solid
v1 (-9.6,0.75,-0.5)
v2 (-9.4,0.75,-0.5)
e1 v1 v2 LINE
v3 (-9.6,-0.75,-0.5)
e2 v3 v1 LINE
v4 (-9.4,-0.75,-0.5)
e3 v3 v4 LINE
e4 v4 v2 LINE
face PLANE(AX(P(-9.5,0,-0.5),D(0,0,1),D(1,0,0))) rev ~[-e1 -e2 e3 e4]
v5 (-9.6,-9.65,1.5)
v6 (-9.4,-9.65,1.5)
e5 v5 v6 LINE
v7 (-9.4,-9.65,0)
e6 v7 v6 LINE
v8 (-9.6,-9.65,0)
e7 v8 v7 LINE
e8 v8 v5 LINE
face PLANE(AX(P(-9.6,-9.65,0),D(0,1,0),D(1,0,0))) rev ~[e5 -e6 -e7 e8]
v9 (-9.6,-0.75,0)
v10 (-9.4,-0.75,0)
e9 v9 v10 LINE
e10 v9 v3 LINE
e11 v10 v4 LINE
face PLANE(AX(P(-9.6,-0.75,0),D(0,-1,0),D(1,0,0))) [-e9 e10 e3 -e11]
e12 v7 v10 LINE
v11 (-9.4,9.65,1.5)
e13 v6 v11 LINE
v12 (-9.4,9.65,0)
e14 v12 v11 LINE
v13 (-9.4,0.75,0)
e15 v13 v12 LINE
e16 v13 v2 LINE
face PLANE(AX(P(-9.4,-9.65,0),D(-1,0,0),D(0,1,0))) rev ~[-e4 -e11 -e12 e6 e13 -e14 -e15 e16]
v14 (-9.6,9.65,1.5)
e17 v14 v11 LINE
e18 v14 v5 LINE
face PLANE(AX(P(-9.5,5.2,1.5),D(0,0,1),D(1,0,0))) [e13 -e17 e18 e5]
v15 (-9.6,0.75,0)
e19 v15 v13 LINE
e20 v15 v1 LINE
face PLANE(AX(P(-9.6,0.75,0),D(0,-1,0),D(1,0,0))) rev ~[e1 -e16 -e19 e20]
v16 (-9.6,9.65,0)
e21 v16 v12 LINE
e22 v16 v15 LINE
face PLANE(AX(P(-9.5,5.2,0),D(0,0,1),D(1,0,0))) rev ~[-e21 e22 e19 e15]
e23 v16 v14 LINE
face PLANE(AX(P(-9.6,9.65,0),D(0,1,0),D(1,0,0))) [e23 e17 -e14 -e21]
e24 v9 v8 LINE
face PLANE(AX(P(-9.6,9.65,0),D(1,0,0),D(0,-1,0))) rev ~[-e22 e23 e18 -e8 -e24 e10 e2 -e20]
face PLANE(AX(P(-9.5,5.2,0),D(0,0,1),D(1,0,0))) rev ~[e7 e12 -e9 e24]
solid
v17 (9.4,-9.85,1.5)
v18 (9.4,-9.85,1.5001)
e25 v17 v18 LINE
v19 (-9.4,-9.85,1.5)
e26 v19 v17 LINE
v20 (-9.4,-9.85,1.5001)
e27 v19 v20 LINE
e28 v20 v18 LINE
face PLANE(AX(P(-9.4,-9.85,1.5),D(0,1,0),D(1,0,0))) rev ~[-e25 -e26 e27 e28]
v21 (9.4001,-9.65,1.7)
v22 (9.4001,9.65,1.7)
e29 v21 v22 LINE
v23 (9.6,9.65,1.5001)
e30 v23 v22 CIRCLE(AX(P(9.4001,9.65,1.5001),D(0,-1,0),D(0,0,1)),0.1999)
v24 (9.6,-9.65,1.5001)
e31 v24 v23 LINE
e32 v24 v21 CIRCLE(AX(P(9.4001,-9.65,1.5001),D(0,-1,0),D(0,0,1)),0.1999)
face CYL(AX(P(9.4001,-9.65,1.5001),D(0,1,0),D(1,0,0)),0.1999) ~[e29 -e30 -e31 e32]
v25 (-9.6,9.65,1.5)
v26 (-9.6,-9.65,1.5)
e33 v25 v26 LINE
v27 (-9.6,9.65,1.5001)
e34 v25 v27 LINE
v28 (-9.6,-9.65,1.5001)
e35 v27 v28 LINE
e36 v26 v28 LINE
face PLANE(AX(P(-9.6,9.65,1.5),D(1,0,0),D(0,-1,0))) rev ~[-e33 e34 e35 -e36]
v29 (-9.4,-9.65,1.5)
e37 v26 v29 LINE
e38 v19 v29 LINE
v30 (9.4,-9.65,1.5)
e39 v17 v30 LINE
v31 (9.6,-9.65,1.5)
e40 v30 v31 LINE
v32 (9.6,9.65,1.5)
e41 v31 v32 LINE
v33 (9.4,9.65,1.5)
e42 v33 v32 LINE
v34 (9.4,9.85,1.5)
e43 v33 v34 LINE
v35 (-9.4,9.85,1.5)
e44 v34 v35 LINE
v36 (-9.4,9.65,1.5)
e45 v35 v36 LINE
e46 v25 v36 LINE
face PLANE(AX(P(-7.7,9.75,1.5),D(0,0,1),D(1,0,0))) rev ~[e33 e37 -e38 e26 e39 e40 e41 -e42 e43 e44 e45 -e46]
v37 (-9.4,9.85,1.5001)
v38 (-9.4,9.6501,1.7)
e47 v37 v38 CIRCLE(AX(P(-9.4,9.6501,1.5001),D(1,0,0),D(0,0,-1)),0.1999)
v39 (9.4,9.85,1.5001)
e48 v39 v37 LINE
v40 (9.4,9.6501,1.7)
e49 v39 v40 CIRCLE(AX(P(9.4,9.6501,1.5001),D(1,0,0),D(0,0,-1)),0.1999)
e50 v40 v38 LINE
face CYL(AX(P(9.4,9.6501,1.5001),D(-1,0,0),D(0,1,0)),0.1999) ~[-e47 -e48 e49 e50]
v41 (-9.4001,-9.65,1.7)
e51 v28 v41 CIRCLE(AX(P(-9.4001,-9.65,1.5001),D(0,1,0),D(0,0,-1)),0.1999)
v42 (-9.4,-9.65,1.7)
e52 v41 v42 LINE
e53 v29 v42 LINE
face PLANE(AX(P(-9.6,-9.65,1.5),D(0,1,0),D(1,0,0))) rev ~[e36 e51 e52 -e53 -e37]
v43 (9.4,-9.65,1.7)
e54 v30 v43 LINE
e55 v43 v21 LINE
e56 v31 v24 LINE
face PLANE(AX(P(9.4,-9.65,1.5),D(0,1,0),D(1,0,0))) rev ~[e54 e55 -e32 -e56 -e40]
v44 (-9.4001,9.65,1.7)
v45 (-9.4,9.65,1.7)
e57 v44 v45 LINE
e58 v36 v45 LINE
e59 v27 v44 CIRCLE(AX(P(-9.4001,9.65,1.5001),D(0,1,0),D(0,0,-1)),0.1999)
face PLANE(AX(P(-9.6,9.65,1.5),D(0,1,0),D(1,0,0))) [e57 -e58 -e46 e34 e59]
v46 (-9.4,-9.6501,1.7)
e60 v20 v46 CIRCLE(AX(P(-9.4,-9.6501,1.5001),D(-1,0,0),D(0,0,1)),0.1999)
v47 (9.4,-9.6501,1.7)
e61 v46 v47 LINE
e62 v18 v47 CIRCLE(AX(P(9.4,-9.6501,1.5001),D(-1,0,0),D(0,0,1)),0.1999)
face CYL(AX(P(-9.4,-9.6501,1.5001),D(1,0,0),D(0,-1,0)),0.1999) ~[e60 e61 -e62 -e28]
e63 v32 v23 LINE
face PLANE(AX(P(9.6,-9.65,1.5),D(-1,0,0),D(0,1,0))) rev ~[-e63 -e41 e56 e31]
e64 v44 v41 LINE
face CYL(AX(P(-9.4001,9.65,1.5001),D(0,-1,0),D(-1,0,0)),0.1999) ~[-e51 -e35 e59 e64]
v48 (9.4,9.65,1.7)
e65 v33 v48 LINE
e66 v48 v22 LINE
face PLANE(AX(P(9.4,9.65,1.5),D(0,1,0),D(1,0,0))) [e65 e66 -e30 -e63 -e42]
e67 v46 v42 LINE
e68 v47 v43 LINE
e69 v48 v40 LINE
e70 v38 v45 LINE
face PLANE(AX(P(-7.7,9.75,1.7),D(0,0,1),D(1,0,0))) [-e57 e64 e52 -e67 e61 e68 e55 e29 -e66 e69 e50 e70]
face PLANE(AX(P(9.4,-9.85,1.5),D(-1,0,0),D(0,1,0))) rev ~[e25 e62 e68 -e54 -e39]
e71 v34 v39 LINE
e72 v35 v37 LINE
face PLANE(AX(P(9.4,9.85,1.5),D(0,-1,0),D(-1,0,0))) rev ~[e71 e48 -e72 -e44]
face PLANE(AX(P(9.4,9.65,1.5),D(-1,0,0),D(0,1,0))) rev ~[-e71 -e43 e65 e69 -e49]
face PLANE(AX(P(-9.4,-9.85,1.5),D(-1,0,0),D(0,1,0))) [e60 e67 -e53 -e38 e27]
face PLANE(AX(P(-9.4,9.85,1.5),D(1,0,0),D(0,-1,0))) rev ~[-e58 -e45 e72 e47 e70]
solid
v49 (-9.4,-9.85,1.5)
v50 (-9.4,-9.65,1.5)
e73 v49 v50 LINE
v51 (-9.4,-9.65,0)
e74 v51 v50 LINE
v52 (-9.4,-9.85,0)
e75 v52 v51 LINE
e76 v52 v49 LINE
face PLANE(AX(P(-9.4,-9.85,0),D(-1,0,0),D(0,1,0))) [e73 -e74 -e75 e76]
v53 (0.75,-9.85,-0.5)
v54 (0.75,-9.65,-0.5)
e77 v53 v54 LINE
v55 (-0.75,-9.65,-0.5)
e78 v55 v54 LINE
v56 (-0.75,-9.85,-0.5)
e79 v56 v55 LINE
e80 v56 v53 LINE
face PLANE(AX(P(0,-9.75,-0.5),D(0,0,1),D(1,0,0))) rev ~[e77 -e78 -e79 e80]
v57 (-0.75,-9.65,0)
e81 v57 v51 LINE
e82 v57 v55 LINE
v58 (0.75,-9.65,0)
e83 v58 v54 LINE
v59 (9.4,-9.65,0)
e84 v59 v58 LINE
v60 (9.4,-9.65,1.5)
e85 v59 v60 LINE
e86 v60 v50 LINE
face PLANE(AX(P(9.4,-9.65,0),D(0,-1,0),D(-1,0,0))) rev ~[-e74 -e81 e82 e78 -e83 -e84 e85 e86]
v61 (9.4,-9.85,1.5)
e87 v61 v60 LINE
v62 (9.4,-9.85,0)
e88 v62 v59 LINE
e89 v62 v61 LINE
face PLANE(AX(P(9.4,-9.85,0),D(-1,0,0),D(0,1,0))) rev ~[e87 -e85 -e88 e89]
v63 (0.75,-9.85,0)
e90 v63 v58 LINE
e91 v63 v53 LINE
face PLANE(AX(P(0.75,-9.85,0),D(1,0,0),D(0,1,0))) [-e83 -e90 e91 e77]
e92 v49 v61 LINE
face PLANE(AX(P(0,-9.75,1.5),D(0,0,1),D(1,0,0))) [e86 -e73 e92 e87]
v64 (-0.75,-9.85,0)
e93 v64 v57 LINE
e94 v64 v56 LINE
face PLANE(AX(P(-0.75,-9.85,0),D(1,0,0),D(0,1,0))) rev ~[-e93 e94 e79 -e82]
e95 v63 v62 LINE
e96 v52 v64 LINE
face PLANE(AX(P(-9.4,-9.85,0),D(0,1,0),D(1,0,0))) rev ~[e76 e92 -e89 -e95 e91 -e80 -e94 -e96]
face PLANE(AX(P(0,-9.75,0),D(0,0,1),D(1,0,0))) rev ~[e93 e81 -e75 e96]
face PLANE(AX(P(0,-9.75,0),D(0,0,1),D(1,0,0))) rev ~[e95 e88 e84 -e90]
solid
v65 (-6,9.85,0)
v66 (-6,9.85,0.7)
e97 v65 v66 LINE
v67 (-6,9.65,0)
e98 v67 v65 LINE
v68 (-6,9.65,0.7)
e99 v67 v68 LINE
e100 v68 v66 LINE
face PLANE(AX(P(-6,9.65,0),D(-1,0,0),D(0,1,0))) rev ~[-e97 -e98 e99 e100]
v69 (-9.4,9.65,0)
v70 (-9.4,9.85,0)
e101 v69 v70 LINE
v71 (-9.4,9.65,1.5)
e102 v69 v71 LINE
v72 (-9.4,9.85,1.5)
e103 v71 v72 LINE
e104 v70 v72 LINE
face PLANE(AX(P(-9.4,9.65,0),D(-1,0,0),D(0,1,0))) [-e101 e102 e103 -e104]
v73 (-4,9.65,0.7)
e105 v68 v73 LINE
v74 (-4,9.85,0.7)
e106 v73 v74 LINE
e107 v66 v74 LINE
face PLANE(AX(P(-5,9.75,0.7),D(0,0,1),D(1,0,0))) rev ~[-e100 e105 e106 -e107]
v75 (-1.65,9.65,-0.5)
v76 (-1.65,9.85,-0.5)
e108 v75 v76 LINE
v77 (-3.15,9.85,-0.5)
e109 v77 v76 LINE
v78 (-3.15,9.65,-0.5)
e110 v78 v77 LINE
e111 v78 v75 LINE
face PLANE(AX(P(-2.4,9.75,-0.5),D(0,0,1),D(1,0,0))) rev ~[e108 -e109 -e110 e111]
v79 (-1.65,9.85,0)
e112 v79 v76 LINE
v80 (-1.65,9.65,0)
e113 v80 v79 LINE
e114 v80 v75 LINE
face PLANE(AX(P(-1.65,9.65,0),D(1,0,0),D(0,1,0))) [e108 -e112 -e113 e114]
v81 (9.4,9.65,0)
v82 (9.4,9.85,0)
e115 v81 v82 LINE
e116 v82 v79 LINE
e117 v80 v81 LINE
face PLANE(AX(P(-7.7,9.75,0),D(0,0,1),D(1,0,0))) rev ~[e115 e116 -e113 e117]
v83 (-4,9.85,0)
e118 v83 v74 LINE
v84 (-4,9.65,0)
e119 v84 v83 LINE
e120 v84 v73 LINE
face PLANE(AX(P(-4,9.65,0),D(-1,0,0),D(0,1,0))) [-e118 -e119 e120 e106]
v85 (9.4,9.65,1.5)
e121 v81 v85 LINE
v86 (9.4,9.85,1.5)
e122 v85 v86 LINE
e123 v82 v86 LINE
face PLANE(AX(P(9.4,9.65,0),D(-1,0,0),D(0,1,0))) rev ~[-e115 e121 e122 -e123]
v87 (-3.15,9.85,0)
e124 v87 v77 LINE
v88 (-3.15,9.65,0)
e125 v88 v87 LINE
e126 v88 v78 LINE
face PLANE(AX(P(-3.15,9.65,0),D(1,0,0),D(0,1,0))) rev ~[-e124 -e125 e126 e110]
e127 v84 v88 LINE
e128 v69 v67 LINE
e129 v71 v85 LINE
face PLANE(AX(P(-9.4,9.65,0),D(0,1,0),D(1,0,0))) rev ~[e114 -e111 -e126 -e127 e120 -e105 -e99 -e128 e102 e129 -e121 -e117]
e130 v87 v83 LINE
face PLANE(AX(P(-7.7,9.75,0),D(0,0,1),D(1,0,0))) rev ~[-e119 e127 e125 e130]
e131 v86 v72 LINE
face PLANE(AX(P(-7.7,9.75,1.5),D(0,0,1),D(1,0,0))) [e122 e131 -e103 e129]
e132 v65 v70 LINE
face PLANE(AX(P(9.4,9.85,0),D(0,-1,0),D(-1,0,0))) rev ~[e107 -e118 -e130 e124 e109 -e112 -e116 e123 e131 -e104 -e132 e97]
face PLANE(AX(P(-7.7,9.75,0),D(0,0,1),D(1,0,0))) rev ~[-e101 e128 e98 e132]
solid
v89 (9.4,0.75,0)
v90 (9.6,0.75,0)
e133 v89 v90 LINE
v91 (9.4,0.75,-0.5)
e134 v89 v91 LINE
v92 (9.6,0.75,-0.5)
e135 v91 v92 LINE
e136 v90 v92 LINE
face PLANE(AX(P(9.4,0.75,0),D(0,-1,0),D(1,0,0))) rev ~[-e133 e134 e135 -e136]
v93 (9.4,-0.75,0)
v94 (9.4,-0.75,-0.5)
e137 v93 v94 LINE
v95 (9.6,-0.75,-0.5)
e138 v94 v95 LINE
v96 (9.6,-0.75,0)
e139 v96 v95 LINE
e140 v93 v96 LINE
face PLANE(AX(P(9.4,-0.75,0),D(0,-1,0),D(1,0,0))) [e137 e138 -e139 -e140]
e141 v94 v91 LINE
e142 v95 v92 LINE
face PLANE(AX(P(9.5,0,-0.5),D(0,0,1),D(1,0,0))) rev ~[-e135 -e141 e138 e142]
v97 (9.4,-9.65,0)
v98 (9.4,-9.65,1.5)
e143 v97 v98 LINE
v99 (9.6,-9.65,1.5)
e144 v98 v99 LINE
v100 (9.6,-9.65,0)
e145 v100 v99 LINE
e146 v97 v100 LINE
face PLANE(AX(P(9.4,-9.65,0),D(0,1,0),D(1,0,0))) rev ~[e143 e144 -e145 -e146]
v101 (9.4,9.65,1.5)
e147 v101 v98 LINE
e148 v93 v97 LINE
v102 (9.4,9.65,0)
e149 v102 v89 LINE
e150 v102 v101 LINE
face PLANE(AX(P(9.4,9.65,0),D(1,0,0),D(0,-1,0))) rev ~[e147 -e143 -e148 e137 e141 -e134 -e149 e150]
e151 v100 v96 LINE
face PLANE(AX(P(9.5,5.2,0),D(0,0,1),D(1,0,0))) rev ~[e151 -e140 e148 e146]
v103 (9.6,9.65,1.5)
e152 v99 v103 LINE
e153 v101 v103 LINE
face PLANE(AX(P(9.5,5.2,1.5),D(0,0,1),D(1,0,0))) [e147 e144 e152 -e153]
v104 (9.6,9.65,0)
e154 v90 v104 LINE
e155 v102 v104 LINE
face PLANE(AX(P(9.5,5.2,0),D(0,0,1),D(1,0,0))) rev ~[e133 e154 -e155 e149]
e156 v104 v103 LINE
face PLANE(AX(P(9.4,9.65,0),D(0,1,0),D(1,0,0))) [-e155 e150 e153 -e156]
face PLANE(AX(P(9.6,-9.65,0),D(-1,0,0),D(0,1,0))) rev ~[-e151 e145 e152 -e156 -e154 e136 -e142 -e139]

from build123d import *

# Parameters (mm, degrees)
F0_W     = 3.4
F0_H     = 0.2
F0_W_2   = 2
F0_W_3   = 0.85
F0_W_4   = 1.5
F0_W_5   = 11.05
F1_DEPTH = 1.5
F0_W_6   = 0.2
F0_H_2   = 8.9
F0_H_3   = 1.5
F2_DEPTH = 1.5
F3_DEPTH = 1.5
F0_W_7   = 8.65
F4_DEPTH = 1.5
F5_START = 1.5
F5_DEPTH = 0.2
F6_DEPTH = 0.7
F7_DEPTH = 0.5
F8_R     = 0.1999


# Not quite as in the source:
# - a fillet or chamfer is up to 0.001 mm smaller than in the source, because OpenCascade refuses the exact size


with BuildPart() as f1:
    # F0 (on Top) → F1 (new body)
    with BuildSketch(Plane.XY):
        with Locations((-7.7, 9.75)):
            Rectangle(F0_W, F0_H)
        with Locations((-5, 9.75)):
            Rectangle(F0_W_2, F0_H)
        with Locations((-3.575, 9.75)):
            Rectangle(F0_W_3, F0_H)
        with Locations((-2.4, 9.75)):
            Rectangle(F0_W_4, F0_H)
        with Locations((3.875, 9.75)):
            Rectangle(F0_W_5, F0_H)
    extrude(amount=F1_DEPTH)

    # F0 (on Top) → F6 (cut)
    with BuildSketch(Plane.XY):
        with Locations((-5, 9.75)):
            Rectangle(F0_W_2, F0_H)
    extrude(amount=F6_DEPTH, mode=Mode.SUBTRACT)

    # F0 (on Top) → F7 (join)
    with BuildSketch(Plane.XY):
        with Locations((-2.4, 9.75)):
            Rectangle(F0_W_4, F0_H)
    extrude(amount=-F7_DEPTH)


with BuildPart() as f2:
    # F0 (on Top) → F2 (new body)
    with BuildSketch(Plane.XY):
        with Locations((9.5, 5.2)):
            Rectangle(F0_W_6, F0_H_2)
        with Locations((9.5, 0)):
            Rectangle(F0_W_6, F0_H_3)
        with Locations((9.5, -5.2)):
            Rectangle(F0_W_6, F0_H_2)
    extrude(amount=F2_DEPTH)

    # F0 (on Top) → F7, piece 2 (join)
    with BuildSketch(Plane.XY):
        with Locations((9.5, 0)):
            Rectangle(F0_W_6, F0_H_3)
    extrude(amount=-F7_DEPTH)


with BuildPart() as f3:
    # F0 (on Top) → F3 (new body)
    with BuildSketch(Plane.XY):
        with Locations((-9.5, 5.2)):
            Rectangle(F0_W_6, F0_H_2)
        with Locations((-9.5, 0)):
            Rectangle(F0_W_6, F0_H_3)
        with Locations((-9.5, -5.2)):
            Rectangle(F0_W_6, F0_H_2)
    extrude(amount=F3_DEPTH)

    # F0 (on Top) → F7, piece 4 (join)
    with BuildSketch(Plane.XY):
        with Locations((-9.5, 0)):
            Rectangle(F0_W_6, F0_H_3)
    extrude(amount=-F7_DEPTH)


with BuildPart() as f4:
    # F0 (on Top) → F4 (new body)
    with BuildSketch(Plane.XY):
        with Locations((0, -9.75)):
            Rectangle(F0_W_4, F0_H)
        with Locations((5.075, -9.75)):
            Rectangle(F0_W_7, F0_H)
        with Locations((-5.075, -9.75)):
            Rectangle(F0_W_7, F0_H)
    extrude(amount=F4_DEPTH)

    # F0 (on Top) → F7, piece 3 (join)
    with BuildSketch(Plane.XY):
        with Locations((0, -9.75)):
            Rectangle(F0_W_4, F0_H)
    extrude(amount=-F7_DEPTH)


with BuildPart() as f5:
    # F0 (on Top) → F5 (new body)
    with BuildSketch(Plane.XY.offset(F5_START)):
        with Locations((-7.7, 9.75)):
            Rectangle(F0_W, F0_H)
        with Locations((-5, 9.75)):
            Rectangle(F0_W_2, F0_H)
        with Locations((-3.575, 9.75)):
            Rectangle(F0_W_3, F0_H)
        with Locations((-2.4, 9.75)):
            Rectangle(F0_W_4, F0_H)
        with Locations((3.875, 9.75)):
            Rectangle(F0_W_5, F0_H)
        with Locations((9.5, 5.2)):
            Rectangle(F0_W_6, F0_H_2)
        Polygon((9.4, 0.75), (9.4, 9.65), (-1.65, 9.65), (-3.15, 9.65), (-4, 9.65), (-6, 9.65), (-9.4, 9.65), (-9.4, 0.75), (-9.4, -0.75), (-9.4, -9.65), (-0.75, -9.65), (0.75, -9.65), (9.4, -9.65), (9.4, -0.75), align=None)
        with Locations((-9.5, 5.2)):
            Rectangle(F0_W_6, F0_H_2)
        with Locations((-9.5, 0)):
            Rectangle(F0_W_6, F0_H_3)
        with Locations((-9.5, -5.2)):
            Rectangle(F0_W_6, F0_H_2)
        with Locations((-5.075, -9.75)):
            Rectangle(F0_W_7, F0_H)
        with Locations((0, -9.75)):
            Rectangle(F0_W_4, F0_H)
        with Locations((5.075, -9.75)):
            Rectangle(F0_W_7, F0_H)
        with Locations((9.5, -5.2)):
            Rectangle(F0_W_6, F0_H_2)
        with Locations((9.5, 0)):
            Rectangle(F0_W_6, F0_H_3)
    extrude(amount=F5_DEPTH)

    # F8 (radius 0.2 in the source; OpenCascade refuses exactly that, so slightly less here)
    f8_edges = [f5.edges().sort_by_distance(p)[0] for p in [
        (-9.6, 0, 1.7),
        (0, 9.85, 1.7),
        (9.6, 0, 1.7),
        (0, -9.85, 1.7),
    ]]
    fillet(f8_edges, radius=F8_R)


solid = Compound([f1.part, f2.part, f3.part, f4.part, f5.part])
